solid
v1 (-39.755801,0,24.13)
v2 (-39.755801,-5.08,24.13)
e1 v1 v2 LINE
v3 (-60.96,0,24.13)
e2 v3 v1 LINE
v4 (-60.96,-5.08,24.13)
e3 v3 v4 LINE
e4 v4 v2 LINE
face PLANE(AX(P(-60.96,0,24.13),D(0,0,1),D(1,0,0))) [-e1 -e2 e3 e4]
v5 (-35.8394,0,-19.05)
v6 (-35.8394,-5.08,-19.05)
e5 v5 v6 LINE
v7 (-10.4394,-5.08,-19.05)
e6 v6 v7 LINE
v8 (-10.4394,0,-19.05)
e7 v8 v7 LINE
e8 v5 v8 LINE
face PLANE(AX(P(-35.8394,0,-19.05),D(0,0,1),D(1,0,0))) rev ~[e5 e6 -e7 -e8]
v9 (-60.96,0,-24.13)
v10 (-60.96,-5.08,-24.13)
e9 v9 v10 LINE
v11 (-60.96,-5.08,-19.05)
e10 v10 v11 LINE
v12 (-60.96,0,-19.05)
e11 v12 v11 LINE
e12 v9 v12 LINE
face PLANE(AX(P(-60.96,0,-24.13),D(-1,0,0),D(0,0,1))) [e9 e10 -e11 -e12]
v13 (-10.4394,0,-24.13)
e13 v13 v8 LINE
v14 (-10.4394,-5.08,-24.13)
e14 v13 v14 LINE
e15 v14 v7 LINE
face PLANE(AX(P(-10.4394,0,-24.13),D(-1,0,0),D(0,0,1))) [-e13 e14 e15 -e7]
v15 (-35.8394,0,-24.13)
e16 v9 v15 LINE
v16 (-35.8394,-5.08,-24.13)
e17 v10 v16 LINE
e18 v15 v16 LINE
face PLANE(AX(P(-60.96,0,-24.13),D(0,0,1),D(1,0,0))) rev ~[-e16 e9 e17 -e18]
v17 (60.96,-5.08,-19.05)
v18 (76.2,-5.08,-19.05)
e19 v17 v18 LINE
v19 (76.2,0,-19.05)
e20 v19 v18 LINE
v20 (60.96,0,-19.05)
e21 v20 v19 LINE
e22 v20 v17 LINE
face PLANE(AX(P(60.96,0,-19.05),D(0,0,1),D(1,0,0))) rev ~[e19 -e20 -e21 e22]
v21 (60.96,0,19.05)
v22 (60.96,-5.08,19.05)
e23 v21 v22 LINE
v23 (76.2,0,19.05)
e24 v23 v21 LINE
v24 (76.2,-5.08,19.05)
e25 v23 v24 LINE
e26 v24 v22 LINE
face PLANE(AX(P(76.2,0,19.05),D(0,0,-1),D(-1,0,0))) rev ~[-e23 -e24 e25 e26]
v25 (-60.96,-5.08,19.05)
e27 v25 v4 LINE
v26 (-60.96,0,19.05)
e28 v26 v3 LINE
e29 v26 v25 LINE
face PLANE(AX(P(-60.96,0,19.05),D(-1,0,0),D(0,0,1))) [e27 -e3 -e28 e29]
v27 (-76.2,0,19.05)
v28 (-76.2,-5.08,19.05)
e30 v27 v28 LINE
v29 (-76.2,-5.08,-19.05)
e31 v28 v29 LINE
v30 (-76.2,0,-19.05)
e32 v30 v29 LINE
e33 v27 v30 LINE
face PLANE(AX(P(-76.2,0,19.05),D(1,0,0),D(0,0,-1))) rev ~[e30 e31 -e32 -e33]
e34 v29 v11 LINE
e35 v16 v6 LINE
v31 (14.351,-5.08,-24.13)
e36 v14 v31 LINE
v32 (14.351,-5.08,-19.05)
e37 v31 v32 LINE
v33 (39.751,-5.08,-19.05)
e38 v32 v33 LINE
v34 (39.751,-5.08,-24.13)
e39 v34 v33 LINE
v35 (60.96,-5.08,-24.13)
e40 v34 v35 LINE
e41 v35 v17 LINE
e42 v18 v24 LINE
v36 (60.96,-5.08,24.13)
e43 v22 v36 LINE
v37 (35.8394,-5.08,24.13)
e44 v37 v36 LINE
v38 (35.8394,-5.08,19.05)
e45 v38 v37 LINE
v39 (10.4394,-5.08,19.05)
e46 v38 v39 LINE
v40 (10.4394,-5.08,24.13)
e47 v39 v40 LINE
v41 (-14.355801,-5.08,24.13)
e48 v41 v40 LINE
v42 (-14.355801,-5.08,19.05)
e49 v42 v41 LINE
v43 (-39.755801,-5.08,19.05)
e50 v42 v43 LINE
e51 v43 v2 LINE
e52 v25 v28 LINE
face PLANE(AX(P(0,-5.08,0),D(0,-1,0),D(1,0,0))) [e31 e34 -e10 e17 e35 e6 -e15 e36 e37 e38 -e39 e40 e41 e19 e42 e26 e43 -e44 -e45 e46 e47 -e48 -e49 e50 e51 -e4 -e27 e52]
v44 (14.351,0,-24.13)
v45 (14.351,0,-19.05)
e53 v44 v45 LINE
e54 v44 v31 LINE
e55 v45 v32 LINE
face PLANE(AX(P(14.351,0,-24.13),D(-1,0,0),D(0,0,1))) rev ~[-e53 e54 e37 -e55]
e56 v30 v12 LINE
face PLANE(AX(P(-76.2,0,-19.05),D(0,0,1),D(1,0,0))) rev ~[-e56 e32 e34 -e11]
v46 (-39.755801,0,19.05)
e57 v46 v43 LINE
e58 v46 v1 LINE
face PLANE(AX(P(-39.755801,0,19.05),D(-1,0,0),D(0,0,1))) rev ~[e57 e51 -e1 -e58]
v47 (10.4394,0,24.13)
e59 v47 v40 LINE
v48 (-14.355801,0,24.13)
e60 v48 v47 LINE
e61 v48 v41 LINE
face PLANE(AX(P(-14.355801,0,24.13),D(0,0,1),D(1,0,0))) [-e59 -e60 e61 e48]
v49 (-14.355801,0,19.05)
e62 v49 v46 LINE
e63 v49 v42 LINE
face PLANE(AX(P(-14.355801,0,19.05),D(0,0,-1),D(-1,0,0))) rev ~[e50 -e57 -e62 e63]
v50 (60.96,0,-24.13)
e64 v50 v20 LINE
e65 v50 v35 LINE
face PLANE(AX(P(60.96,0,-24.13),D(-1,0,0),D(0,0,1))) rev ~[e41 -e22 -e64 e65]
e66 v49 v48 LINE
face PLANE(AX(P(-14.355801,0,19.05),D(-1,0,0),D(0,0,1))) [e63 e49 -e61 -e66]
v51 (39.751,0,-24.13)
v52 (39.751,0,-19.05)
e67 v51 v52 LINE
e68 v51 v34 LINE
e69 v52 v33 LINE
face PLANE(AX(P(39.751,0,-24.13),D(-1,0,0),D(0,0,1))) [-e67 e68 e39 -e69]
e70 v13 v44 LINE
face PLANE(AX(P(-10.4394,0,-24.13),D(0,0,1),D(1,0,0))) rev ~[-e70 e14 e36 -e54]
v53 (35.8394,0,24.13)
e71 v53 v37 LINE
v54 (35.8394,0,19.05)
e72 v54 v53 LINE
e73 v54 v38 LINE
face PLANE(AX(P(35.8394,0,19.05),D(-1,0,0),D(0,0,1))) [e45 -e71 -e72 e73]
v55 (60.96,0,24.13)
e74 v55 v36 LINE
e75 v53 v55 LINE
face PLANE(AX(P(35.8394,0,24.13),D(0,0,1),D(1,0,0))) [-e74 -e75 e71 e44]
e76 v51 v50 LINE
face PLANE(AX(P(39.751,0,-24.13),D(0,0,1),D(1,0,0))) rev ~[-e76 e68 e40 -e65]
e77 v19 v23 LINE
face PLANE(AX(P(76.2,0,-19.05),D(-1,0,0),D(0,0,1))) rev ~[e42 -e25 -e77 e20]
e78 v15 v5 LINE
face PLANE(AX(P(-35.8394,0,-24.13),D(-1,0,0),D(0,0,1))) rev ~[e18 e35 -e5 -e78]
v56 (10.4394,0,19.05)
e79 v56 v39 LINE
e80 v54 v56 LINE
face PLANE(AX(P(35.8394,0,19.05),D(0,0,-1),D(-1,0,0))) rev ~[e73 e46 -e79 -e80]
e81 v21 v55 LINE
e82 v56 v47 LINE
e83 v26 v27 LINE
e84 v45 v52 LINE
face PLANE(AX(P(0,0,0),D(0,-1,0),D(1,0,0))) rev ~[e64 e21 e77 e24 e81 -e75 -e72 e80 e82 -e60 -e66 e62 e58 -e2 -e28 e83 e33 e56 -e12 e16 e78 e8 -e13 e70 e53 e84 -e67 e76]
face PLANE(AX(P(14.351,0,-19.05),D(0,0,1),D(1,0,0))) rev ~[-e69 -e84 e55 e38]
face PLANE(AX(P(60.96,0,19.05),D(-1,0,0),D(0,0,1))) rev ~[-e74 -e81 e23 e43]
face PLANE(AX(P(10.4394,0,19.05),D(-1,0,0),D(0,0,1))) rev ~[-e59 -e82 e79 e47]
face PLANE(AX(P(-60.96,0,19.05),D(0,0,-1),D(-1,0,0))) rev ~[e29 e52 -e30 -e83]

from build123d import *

# Parameters (mm, degrees)
F0_W     = 21.2041994
F0_H     = 5.08
F0_W_2   = 24.7952006
F0_W_3   = 25.1206
F0_W_4   = 24.7904
F0_W_5   = 21.209
F1_DEPTH = 5.08


# Not quite as in the source:
# - a feature names something its author has since deleted; it is built from what else it names


with BuildPart() as f1:
    # F0 (on Front) → F1 (new body)
    with BuildSketch(Plane.XZ):
        Polygon((60.96, -19.05), (76.2, -19.05), (76.2, 19.05), (60.96, 19.05), (35.8394, 19.05), (10.4394, 19.05), (-14.3558006, 19.05), (-39.7558006, 19.05), (-60.96, 19.05), (-76.2, 19.05), (-76.2, -19.05), (-60.96, -19.05), (-35.8394, -19.05), (-10.4394, -19.05), (14.351, -19.05), (39.751, -19.05), align=None)
        with Locations((-50.3579003, 21.59)):
            Rectangle(F0_W, F0_H)
        with Locations((-1.9582003, 21.59)):
            Rectangle(F0_W_2, F0_H)
        with Locations((48.3997, 21.59)):
            Rectangle(F0_W_3, F0_H)
        with Locations((1.9558, -21.59)):
            Rectangle(F0_W_4, F0_H)
        with Locations((50.3555, -21.59)):
            Rectangle(F0_W_5, F0_H)
        with Locations((-48.3997, -21.59)):
            Rectangle(F0_W_3, F0_H)
    extrude(amount=F1_DEPTH)


solid = f1.part
